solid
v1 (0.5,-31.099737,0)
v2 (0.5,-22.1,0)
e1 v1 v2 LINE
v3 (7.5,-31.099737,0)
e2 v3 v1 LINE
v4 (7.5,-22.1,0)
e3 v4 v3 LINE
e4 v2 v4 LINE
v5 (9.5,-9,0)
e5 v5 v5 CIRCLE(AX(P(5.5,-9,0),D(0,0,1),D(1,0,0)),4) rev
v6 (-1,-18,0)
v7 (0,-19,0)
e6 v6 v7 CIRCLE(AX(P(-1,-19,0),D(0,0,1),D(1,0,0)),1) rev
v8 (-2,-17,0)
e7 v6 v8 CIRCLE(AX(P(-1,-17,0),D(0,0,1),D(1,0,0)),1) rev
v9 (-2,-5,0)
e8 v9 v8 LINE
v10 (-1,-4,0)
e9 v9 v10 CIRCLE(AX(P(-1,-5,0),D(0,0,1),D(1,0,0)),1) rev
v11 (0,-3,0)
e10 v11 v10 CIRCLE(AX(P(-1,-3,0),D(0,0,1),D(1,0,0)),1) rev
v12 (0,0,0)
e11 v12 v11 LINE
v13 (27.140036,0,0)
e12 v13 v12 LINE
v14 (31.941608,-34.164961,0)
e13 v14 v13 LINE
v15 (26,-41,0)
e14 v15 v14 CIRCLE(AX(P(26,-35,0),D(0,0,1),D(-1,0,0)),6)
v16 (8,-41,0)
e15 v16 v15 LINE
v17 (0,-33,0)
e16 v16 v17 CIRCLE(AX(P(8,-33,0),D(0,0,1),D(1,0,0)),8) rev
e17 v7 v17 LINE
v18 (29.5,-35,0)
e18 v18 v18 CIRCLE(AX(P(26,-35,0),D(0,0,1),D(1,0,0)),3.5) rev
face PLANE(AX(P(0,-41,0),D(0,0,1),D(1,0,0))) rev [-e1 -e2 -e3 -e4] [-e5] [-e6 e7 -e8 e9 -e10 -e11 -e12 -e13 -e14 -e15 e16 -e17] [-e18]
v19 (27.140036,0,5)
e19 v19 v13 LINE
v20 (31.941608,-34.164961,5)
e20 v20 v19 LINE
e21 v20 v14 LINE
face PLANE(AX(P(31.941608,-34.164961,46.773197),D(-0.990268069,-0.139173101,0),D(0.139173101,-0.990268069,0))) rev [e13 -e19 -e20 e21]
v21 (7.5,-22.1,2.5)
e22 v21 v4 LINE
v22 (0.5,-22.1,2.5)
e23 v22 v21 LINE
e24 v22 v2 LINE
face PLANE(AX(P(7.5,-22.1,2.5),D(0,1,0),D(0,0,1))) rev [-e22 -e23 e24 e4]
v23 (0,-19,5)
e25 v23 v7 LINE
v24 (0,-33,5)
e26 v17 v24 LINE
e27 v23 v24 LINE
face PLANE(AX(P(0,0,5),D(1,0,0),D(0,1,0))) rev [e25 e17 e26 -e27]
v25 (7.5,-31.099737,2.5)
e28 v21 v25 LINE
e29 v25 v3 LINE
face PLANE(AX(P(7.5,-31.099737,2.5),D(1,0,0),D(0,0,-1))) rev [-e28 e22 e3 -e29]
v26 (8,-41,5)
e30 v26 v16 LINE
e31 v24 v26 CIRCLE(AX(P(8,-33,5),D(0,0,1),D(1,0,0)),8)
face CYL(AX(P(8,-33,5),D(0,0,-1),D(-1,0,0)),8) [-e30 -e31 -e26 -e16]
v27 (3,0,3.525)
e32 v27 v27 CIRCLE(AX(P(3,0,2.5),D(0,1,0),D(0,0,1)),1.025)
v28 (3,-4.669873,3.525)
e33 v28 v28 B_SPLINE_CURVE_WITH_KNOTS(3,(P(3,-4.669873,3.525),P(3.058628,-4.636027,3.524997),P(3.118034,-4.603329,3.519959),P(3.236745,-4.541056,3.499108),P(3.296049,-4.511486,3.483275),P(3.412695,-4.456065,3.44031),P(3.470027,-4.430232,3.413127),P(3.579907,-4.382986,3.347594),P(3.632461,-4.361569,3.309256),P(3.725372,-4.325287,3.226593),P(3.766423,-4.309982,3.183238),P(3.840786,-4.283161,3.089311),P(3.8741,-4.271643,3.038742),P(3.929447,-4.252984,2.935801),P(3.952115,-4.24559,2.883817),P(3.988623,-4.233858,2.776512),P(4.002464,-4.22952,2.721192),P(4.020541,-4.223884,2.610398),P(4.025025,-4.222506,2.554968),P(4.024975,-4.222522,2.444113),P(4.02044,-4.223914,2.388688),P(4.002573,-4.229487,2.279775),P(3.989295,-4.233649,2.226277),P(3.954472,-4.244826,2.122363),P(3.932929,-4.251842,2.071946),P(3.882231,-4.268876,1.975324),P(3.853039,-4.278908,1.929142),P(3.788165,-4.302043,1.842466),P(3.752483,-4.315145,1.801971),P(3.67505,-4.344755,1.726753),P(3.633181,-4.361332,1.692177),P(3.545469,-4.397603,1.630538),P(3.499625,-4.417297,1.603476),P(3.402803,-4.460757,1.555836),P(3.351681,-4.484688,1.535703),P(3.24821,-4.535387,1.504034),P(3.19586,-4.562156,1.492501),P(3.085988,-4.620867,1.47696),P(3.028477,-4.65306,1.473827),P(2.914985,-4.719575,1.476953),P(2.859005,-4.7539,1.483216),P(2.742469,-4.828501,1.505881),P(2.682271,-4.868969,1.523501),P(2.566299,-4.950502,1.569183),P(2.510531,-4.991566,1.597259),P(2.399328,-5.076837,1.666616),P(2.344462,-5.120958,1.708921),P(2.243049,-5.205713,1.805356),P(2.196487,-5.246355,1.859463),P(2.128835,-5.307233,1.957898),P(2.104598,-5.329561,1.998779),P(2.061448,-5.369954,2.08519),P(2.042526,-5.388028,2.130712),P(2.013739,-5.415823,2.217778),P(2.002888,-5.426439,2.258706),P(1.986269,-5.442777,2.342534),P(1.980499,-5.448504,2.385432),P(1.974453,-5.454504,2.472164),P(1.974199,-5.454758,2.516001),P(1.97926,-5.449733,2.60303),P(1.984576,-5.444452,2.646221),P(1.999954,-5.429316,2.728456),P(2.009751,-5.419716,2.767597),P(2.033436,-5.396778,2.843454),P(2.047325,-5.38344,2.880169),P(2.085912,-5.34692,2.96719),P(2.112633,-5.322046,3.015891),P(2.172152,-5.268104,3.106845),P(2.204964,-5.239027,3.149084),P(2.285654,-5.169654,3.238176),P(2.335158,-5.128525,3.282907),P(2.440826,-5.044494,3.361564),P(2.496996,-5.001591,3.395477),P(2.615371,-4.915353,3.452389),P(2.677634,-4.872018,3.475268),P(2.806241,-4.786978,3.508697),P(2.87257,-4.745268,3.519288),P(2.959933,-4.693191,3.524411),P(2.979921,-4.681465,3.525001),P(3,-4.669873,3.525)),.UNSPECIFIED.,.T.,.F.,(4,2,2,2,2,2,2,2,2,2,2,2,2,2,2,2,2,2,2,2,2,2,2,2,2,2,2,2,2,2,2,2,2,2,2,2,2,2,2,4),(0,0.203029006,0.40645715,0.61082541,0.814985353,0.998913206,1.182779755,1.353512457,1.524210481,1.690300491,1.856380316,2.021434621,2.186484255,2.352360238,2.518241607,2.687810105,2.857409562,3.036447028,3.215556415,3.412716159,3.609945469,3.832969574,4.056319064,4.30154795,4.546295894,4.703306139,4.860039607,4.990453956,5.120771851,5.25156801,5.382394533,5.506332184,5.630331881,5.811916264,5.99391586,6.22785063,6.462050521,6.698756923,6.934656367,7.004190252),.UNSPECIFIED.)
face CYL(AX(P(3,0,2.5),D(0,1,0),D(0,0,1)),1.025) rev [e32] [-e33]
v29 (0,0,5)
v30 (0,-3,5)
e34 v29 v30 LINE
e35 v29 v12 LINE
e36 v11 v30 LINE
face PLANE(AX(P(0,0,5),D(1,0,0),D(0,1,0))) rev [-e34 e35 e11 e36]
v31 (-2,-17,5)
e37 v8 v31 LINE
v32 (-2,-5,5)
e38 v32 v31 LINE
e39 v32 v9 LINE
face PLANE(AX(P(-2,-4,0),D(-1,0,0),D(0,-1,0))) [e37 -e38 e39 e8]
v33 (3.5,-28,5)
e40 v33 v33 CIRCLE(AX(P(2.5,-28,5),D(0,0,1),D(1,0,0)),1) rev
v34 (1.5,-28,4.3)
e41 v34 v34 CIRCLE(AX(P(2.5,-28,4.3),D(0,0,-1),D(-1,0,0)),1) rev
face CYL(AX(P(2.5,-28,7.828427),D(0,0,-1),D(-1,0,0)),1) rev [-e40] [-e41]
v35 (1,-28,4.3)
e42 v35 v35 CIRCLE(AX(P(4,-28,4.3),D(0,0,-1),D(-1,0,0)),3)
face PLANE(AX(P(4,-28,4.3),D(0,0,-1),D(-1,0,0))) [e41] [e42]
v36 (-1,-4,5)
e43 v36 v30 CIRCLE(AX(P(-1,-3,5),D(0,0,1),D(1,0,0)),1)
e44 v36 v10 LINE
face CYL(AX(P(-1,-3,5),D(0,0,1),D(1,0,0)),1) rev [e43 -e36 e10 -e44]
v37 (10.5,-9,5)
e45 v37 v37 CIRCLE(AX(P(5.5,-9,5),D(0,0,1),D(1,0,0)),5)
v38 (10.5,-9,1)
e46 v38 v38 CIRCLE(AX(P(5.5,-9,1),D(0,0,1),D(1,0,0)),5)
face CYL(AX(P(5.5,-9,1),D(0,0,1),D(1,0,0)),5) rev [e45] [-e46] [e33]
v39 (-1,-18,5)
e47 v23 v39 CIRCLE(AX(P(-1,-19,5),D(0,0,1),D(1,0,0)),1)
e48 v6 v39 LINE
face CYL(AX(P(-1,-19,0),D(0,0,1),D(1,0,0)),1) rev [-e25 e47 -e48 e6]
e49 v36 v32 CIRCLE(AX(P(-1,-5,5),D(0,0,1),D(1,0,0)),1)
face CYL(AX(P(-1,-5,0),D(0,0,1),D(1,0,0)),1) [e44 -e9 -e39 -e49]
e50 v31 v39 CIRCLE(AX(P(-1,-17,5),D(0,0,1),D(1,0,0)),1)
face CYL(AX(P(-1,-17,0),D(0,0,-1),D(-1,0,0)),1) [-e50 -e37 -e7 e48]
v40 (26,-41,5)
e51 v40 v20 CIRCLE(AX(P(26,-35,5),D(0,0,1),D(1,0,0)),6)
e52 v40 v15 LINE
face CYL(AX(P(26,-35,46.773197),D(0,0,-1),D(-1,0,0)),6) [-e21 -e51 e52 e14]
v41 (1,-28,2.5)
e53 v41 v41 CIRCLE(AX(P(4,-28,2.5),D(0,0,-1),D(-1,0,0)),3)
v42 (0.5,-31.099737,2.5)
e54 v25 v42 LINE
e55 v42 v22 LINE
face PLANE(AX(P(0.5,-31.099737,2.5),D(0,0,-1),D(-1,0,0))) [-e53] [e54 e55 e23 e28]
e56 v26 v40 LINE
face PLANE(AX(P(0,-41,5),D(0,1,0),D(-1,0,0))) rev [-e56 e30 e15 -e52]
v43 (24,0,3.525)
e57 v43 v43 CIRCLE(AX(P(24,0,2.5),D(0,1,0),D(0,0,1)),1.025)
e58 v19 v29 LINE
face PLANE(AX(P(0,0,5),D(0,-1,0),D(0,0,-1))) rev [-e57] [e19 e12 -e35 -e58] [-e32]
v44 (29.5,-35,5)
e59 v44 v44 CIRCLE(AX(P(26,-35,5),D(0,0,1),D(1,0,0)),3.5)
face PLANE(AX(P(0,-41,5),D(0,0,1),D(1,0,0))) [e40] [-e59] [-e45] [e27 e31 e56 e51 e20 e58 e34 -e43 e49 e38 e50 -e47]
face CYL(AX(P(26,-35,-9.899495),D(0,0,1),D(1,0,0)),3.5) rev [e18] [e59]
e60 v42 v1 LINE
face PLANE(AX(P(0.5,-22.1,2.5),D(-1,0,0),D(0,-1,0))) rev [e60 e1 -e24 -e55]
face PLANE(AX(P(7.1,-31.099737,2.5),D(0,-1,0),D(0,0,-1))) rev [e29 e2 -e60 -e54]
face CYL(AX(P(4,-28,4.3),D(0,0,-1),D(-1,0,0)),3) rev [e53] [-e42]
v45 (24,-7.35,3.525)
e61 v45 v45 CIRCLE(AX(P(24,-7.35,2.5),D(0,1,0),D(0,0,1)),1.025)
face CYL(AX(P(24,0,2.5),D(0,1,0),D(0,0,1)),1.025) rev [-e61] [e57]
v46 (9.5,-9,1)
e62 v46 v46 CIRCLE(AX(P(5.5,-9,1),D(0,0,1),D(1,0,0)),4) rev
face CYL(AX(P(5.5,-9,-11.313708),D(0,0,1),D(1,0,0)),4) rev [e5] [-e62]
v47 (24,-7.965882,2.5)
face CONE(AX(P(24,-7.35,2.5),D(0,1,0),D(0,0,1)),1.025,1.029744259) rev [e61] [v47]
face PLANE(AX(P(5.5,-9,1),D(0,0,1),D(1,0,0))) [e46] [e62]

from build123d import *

# Parameters (mm, degrees)
SKETCH_1_W               = 34
SKETCH_1_H               = 41
EXTRUDE_1_DEPTH          = 5
FILLET_1_R               = 8
SKETCH_2_R               = 3.5
CUT_EXTRUDE_2_DEPTH      = 5
SKETCH_3_R               = 4
CUT_EXTRUDE_3_DEPTH      = 5
SKETCH_4_R               = 5
CUT_EXTRUDE_4_DEPTH      = 4
HOLE_WIZARD_M2_5_1_D     = 2.05
HOLE_WIZARD_M2_5_1_DEPTH = 7.35
HOLE_WIZARD_M2_5_1_TIP   = 0.615882135
CUT_EXTRUDE_5_DEPTH      = 5
SKETCH_8_R               = 1
CUT_EXTRUDE_6_DEPTH      = 5
CUT_EXTRUDE_7_DEPTH      = 2.5
SKETCH_10_R              = 3
CUT_EXTRUDE_8_DEPTH      = 1.8
SKETCH_20_W              = 5
SKETCH_20_H              = 12
EXTRUDE_1_2_DEPTH        = 3
FILLET_2_R               = 1
CUT_EXTRUDE_1_DEPTH      = 10
SKETCH_26_W              = 2
SKETCH_26_H              = 14
EXTRUDE_2_DEPTH          = 5
FILLET_3_R               = 1
FILLET_4_R               = 1
FILLET_5_R               = 1
FILLET_6_R               = 1


with BuildPart() as part:
    # 草图1 → Extrude 1 (new body)
    with BuildSketch(Plane.XY):
        with Locations((17, -20.5)):
            Rectangle(SKETCH_1_W, SKETCH_1_H)
    extrude(amount=EXTRUDE_1_DEPTH)

    # 圆角1
    fillet_1_edges = [part.edges().sort_by_distance(p)[0] for p in [
        (0, -41, 2.5),
    ]]
    fillet(fillet_1_edges, radius=FILLET_1_R)

    # 草图2 → 拉伸2 (cut)
    with BuildSketch(Plane.XY.offset(5)):
        with Locations((26, -35)):
            Circle(SKETCH_2_R)
    extrude(amount=-CUT_EXTRUDE_2_DEPTH, mode=Mode.SUBTRACT)

    # 草图3 → 拉伸3 (cut)
    with BuildSketch(Plane.XY.offset(5)):
        with Locations((5.5, -9)):
            Circle(SKETCH_3_R)
    extrude(amount=-CUT_EXTRUDE_3_DEPTH, mode=Mode.SUBTRACT)

    # 草图4 → 拉伸4 (cut)
    with BuildSketch(Plane.XY.offset(5)):
        with Locations((5.5, -9)):
            Circle(SKETCH_4_R)
    extrude(amount=-CUT_EXTRUDE_4_DEPTH, mode=Mode.SUBTRACT)

    # M2.5 螺纹孔1
    with Locations(Plane(origin=(3, 0, 2.5), x_dir=(0, 0, 1), z_dir=(0, 1, 0))):
        with Locations((0, 0), (0, 21)):
            Hole(HOLE_WIZARD_M2_5_1_D / 2, depth=HOLE_WIZARD_M2_5_1_DEPTH)
            with Locations((0, 0, -(HOLE_WIZARD_M2_5_1_DEPTH + HOLE_WIZARD_M2_5_1_TIP / 2))):  # 118° drill point
                Cone(0, HOLE_WIZARD_M2_5_1_D / 2, HOLE_WIZARD_M2_5_1_TIP, mode=Mode.SUBTRACT)

    # 草图7 → 拉伸5 (cut)
    with BuildSketch(Plane(origin=(0, 0, 0), x_dir=(-1, 0, 0), z_dir=(0, 0, -1))):
        with BuildLine():
            Line((-31.941608412, -34.164961394), (-27.140036221, 0))
            Line((-27.140036221, 0), (-34, 0))
            Line((-34, 0), (-34, -41))
            Line((-34, -41), (-26, -41))
            ThreePointArc((-26, -41), (-30.528257481, -38.936354174), (-31.941608412, -34.164961394))
        make_face()
    extrude(amount=-CUT_EXTRUDE_5_DEPTH, mode=Mode.SUBTRACT)

    # 草图8 → 拉伸6 (cut)
    with BuildSketch(Plane(origin=(0, 0, 0), x_dir=(-1, 0, 0), z_dir=(0, 0, -1))):
        with Locations((-2.5, -28)):
            Circle(SKETCH_8_R)
    extrude(amount=-CUT_EXTRUDE_6_DEPTH, mode=Mode.SUBTRACT)

    # 草图9 → 拉伸7 (cut)
    with BuildSketch(Plane(origin=(0, 0, 0), x_dir=(-1, 0, 0), z_dir=(0, 0, -1))):
        Polygon((-7.1, -31.099737486), (-0.5, -31.099737486), (-0.5, -30.7), (-0.5, -23.5), (-0.5, -22.1), (-1.9, -22.1), (-6.1, -22.1), (-7.5, -22.1), (-7.5, -23.5), (-7.5, -30.7), (-7.5, -31.099737486), align=None)
    extrude(amount=-CUT_EXTRUDE_7_DEPTH, mode=Mode.SUBTRACT)

    # 草图10 → 拉伸8 (cut)
    with BuildSketch(Plane(origin=(0, 0, 2.5), x_dir=(-1, 0, 0), z_dir=(0, 0, -1))):
        with Locations((-4, -28)):
            Circle(SKETCH_10_R)
    extrude(amount=-CUT_EXTRUDE_8_DEPTH, mode=Mode.SUBTRACT)

    # 草图20 → Extrude 1 2 (add)
    with BuildSketch(Plane.ZY):
        with Locations((2.5, -11)):
            Rectangle(SKETCH_20_W, SKETCH_20_H)
    extrude(amount=EXTRUDE_1_2_DEPTH)

    # 圆角2
    fillet_2_edges = [part.edges().sort_by_distance(p)[0] for p in [
        (0, -17, 2.5),
        (0, -5, 2.5),
        (-3, -17, 2.5),
        (-3, -5, 2.5),
    ]]
    fillet(fillet_2_edges, radius=FILLET_2_R)

    # 草图25 → 切除-拉伸1 (cut)
    with BuildSketch(Plane.XY.offset(5)):
        Polygon((0, 0), (0, -20.48158168), (-11.543504156, -18.602913064), (-5.133928875, -2.100098549), align=None)
    extrude(amount=-CUT_EXTRUDE_1_DEPTH, mode=Mode.SUBTRACT)

    # 草图26 → 凸台-拉伸2 (add)
    with BuildSketch(Plane.XY.offset(5)):
        with Locations((-1, -11)):
            Rectangle(SKETCH_26_W, SKETCH_26_H)
    extrude(amount=-EXTRUDE_2_DEPTH)

    # 圆角3
    fillet_3_edges = [part.edges().sort_by_distance(p)[0] for p in [
        (0, -4, 2.5),
    ]]
    fillet(fillet_3_edges, radius=FILLET_3_R)

    # 圆角4
    fillet_4_edges = [part.edges().sort_by_distance(p)[0] for p in [
        (0, -18, 2.5),
    ]]
    fillet(fillet_4_edges, radius=FILLET_4_R)

    # 圆角5
    fillet_5_edges = [part.edges().sort_by_distance(p)[0] for p in [
        (-2, -4, 2.5),
    ]]
    fillet(fillet_5_edges, radius=FILLET_5_R - 0.0001)  # a hair under: the kernel refuses the full size

    # 圆角6
    fillet_6_edges = [part.edges().sort_by_distance(p)[0] for p in [
        (-2, -18, 2.5),
    ]]
    fillet(fillet_6_edges, radius=FILLET_6_R - 0.0001)  # a hair under: the kernel refuses the full size


solid = part.part
